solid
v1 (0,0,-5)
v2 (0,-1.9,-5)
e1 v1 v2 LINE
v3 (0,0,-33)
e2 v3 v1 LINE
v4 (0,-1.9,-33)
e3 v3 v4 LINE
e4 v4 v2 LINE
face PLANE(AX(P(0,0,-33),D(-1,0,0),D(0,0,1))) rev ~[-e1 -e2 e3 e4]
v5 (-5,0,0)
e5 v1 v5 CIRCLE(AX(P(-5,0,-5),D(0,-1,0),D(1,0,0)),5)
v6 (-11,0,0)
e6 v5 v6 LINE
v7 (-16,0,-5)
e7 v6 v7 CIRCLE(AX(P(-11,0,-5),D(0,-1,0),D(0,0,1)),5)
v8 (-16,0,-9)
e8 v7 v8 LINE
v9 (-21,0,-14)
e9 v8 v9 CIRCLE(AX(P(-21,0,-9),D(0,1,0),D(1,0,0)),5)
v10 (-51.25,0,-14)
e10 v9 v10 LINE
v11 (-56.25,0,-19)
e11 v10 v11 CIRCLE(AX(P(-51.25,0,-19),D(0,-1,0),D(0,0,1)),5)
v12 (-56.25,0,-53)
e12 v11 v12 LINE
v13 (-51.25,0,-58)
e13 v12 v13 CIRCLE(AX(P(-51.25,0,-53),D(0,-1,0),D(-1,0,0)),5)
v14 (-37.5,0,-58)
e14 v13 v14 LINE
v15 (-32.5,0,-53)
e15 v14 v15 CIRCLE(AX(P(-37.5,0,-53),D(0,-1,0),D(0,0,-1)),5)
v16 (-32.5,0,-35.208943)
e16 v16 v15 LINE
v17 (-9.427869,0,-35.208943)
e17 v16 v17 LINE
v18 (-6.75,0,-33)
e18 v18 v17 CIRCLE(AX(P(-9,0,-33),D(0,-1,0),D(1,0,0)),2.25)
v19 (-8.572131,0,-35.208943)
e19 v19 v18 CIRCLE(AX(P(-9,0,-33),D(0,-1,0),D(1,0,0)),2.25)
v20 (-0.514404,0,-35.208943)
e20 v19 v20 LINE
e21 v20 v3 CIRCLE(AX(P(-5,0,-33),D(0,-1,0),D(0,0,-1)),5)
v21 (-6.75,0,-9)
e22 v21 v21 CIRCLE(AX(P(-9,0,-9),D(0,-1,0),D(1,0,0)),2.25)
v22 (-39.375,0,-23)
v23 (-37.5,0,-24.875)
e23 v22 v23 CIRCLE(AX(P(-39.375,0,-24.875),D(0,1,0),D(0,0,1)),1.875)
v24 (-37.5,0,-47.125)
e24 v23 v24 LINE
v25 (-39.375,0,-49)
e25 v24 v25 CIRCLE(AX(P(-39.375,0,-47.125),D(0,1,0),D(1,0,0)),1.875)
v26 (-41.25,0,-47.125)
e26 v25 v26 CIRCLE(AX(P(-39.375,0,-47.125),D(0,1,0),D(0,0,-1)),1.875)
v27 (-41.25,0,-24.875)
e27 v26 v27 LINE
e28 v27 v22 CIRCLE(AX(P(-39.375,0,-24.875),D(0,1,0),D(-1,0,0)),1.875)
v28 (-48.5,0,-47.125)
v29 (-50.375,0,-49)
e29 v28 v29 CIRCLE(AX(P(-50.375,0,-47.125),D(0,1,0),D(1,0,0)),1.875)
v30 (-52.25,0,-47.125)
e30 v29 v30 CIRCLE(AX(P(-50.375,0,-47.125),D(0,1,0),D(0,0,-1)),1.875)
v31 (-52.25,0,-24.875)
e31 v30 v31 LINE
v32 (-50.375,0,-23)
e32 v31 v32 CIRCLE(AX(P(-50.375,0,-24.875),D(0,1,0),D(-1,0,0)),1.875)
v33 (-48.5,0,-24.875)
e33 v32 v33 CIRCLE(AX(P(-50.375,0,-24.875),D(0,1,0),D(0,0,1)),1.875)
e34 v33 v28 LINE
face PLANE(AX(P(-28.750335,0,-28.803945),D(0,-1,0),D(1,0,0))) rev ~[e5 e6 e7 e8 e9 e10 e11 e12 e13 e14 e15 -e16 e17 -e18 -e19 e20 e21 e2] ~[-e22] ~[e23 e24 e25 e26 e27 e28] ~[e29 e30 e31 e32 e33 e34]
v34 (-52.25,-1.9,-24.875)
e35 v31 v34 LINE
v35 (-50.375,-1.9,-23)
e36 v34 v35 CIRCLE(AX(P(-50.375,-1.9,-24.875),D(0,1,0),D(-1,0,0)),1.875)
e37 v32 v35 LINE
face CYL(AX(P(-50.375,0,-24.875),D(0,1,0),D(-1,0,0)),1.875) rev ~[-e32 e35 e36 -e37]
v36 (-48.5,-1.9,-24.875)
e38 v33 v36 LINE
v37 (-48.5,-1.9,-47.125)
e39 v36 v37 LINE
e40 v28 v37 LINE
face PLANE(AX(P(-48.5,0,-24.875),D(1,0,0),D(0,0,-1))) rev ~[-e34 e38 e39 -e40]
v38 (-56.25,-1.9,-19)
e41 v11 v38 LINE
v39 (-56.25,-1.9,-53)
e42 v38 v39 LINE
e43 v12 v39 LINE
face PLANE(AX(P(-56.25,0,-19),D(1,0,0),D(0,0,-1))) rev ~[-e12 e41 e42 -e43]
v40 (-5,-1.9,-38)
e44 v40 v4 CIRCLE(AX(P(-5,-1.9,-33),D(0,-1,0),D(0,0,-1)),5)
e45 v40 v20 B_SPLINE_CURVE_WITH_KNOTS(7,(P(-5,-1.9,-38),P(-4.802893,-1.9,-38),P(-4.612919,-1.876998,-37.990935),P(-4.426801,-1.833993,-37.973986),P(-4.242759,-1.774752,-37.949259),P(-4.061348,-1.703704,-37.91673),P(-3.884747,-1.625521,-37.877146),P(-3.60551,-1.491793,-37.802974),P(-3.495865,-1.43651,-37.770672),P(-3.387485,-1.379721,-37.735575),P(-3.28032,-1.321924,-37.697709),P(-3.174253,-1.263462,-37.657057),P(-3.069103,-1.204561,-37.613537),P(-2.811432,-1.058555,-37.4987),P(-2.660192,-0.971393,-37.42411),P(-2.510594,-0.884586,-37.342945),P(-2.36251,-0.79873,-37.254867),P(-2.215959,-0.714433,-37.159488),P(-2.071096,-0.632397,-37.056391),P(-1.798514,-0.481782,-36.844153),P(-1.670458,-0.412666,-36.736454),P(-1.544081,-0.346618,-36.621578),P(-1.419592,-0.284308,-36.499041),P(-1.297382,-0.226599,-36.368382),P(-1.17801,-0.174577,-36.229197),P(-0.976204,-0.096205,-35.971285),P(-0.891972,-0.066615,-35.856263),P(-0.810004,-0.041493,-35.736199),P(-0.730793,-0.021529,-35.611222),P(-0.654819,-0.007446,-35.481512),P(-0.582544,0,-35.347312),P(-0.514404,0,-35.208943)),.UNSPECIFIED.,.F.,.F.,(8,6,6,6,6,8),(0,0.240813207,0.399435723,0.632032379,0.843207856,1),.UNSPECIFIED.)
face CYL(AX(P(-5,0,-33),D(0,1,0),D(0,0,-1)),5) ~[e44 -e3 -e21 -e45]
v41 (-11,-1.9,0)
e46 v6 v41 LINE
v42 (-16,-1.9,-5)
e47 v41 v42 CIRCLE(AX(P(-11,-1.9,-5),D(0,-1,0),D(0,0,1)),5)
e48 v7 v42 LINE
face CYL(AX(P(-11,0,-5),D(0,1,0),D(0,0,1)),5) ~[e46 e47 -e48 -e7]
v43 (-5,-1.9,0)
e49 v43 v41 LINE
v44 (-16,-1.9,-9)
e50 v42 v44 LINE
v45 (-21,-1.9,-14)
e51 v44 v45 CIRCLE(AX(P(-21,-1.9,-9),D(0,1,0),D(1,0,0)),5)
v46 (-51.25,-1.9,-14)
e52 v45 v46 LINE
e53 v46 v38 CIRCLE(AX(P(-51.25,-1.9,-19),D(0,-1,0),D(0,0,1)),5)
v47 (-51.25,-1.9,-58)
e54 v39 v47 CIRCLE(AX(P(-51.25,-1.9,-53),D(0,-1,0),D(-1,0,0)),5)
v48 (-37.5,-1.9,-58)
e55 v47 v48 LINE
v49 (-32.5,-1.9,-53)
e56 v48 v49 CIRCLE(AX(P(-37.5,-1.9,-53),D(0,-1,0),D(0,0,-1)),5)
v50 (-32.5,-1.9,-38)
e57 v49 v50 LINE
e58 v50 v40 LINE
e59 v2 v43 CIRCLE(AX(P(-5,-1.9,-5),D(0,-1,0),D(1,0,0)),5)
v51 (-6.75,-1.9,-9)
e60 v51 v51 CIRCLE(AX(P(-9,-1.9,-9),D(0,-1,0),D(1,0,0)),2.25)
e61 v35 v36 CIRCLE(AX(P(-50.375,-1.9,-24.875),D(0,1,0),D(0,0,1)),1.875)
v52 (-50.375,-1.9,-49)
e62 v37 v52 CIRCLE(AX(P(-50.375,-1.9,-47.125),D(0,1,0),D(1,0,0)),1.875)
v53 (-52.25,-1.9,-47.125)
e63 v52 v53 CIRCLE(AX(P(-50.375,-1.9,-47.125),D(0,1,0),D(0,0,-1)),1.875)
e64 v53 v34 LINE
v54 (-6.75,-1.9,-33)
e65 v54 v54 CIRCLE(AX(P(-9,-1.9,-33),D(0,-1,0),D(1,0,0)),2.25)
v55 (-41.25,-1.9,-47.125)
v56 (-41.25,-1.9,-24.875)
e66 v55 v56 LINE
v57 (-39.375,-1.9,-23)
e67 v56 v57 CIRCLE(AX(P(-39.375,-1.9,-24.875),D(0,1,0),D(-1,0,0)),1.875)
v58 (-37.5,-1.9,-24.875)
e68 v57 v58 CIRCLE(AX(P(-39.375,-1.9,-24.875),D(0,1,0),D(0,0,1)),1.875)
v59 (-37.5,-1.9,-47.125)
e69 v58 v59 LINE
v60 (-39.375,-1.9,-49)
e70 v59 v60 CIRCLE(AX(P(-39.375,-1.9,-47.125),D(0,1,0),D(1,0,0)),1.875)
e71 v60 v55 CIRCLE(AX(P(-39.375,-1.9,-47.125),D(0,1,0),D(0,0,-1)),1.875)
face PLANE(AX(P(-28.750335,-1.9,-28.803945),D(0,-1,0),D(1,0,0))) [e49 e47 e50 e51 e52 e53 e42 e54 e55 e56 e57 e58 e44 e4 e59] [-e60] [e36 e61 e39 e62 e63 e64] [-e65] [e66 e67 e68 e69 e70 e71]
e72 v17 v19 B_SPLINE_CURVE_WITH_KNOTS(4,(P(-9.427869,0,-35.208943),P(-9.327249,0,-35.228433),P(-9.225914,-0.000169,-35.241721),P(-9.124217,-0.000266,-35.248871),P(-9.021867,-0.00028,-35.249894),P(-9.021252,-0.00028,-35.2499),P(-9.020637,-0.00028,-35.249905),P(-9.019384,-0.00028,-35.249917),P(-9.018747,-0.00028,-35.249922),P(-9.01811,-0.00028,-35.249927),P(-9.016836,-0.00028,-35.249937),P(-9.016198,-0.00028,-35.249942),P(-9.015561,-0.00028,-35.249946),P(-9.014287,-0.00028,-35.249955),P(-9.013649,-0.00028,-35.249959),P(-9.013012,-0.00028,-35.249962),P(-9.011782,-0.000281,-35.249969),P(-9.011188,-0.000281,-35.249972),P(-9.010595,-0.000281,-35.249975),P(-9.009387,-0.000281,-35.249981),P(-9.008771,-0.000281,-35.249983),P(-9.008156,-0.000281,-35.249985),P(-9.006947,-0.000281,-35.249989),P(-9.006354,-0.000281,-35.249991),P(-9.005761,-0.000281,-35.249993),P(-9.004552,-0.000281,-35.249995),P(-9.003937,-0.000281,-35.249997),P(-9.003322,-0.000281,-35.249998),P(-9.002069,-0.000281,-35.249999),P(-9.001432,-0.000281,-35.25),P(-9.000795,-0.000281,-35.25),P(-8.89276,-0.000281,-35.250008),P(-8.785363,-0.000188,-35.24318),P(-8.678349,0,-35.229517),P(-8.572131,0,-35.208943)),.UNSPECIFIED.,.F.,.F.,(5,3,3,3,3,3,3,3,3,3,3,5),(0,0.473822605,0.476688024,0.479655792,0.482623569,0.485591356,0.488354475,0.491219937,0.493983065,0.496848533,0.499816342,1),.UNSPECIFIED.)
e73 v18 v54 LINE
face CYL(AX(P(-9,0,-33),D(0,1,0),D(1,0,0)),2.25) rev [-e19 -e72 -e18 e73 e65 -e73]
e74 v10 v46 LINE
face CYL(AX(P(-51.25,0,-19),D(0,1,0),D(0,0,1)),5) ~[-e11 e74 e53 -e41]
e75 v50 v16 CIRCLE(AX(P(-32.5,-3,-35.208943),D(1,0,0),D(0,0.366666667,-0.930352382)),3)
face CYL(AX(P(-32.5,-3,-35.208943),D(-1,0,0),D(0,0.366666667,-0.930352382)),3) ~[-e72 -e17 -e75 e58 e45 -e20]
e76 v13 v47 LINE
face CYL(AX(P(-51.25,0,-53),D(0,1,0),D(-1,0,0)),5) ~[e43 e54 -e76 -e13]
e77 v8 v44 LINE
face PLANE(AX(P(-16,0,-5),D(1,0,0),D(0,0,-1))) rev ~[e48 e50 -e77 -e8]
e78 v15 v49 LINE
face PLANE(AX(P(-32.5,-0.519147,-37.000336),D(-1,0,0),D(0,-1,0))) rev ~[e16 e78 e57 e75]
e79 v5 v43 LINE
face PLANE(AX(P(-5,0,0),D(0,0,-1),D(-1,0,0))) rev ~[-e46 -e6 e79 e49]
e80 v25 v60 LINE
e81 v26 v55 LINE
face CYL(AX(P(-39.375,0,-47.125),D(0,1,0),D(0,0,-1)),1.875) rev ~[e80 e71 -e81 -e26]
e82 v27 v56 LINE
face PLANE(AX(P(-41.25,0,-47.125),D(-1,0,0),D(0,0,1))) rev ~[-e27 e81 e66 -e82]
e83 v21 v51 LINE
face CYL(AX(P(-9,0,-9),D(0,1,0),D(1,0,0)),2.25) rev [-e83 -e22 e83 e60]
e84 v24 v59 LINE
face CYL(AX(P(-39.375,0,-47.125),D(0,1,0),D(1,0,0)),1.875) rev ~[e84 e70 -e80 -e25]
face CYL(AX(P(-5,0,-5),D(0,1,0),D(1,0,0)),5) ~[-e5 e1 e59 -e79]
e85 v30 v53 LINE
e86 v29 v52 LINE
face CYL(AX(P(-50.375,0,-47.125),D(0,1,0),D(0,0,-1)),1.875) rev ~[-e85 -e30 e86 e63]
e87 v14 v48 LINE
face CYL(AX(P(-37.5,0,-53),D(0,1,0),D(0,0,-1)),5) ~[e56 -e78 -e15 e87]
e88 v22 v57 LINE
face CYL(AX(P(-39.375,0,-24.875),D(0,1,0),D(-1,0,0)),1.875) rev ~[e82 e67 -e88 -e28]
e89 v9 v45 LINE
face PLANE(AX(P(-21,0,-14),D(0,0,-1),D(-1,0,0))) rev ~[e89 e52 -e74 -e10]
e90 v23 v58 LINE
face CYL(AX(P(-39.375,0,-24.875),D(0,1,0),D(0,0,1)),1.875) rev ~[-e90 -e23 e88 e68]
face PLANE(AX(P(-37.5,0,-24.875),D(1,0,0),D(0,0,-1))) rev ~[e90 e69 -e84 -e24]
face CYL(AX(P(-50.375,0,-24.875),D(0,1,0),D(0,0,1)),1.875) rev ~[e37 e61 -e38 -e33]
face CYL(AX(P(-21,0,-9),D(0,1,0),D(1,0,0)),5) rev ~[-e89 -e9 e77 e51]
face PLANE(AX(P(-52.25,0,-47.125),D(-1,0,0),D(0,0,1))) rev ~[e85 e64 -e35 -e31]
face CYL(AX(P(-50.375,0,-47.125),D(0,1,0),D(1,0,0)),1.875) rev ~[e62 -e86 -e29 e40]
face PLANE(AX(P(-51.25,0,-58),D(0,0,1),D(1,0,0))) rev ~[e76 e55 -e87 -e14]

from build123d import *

# Parameters (mm, degrees)
F0_R        = 2.25
F1_DEPTH    = 1.9
F2_T1_DEPTH = 34.4776428685


# Not quite as in the source:
# - a fillet or chamfer that OpenCascade refuses, or shapes differently, is made with other operations: its cross-section is extruded or revolved along the edge and cut away or added


with BuildPart() as f1:
    # F0 (on Front) → F1 (new body)
    with BuildSketch(Plane.XZ):
        with BuildLine():
            Line((0, -33), (0, -5))
            ThreePointArc((0, -5), (-1.4644660941, -1.4644660941), (-5, 0))
            Line((-5, 0), (-11, 0))
            ThreePointArc((-11, 0), (-14.5355339059, -1.4644660941), (-16, -5))
            Line((-16, -5), (-16, -9))
            ThreePointArc((-16, -9), (-17.4644660941, -12.5355339059), (-21, -14))
            Line((-21, -14), (-51.25, -14))
            ThreePointArc((-51.25, -14), (-54.7855339059, -15.4644660941), (-56.25, -19))
            Line((-56.25, -19), (-56.25, -53))
            ThreePointArc((-56.25, -53), (-54.7855339059, -56.5355339059), (-51.25, -58))
            Line((-51.25, -58), (-37.5, -58))
            ThreePointArc((-37.5, -58), (-33.9644660941, -56.5355339059), (-32.5, -53))
            Line((-32.5, -53), (-32.5, -43))
            Line((-32.5, -43), (-32.5, -38))
            Line((-32.5, -38), (-27.5, -38))
            Line((-27.5, -38), (-5, -38))
            ThreePointArc((-5, -38), (-1.4644660941, -36.5355339059), (0, -33))
        make_face()
        with BuildLine():
            Line((-52.25, -47.125), (-52.25, -24.875))
            ThreePointArc((-52.25, -24.875), (-51.7008252147, -23.5491747853), (-50.375, -23))
            ThreePointArc((-50.375, -23), (-49.0491747853, -23.5491747853), (-48.5, -24.875))
            Line((-48.5, -24.875), (-48.5, -47.125))
            ThreePointArc((-48.5, -47.125), (-49.0491747853, -48.4508252147), (-50.375, -49))
            ThreePointArc((-50.375, -49), (-51.7008252147, -48.4508252147), (-52.25, -47.125))
        make_face(mode=Mode.SUBTRACT)
        with BuildLine():
            Line((-41.25, -47.125), (-41.25, -24.875))
            ThreePointArc((-41.25, -24.875), (-40.7008252147, -23.5491747853), (-39.375, -23))
            ThreePointArc((-39.375, -23), (-38.0491747853, -23.5491747853), (-37.5, -24.875))
            Line((-37.5, -24.875), (-37.5, -47.125))
            ThreePointArc((-37.5, -47.125), (-38.0491747853, -48.4508252147), (-39.375, -49))
            ThreePointArc((-39.375, -49), (-40.7008252147, -48.4508252147), (-41.25, -47.125))
        make_face(mode=Mode.SUBTRACT)
        with Locations((-9, -33)):
            Circle(F0_R, mode=Mode.SUBTRACT)
        with Locations((-9, -9)):
            Circle(F0_R, mode=Mode.SUBTRACT)
    extrude(amount=F1_DEPTH)

    # F2: fillet of radius 3 on 1 edges, made by hand

    # F2_s2 → F2_t1 (cut)
    with BuildSketch(Plane.YZ.offset(-32.5)):
        with BuildLine():
            ThreePointArc((-1.9, -38), (-0.5200806465, -36.8971371542), (0, -35.2089428526))
            Line((0, -35.2089428526), (0, -38))
            Line((0, -38), (-1.9, -38))
        make_face()
    extrude(amount=F2_T1_DEPTH, mode=Mode.SUBTRACT)


solid = f1.part
